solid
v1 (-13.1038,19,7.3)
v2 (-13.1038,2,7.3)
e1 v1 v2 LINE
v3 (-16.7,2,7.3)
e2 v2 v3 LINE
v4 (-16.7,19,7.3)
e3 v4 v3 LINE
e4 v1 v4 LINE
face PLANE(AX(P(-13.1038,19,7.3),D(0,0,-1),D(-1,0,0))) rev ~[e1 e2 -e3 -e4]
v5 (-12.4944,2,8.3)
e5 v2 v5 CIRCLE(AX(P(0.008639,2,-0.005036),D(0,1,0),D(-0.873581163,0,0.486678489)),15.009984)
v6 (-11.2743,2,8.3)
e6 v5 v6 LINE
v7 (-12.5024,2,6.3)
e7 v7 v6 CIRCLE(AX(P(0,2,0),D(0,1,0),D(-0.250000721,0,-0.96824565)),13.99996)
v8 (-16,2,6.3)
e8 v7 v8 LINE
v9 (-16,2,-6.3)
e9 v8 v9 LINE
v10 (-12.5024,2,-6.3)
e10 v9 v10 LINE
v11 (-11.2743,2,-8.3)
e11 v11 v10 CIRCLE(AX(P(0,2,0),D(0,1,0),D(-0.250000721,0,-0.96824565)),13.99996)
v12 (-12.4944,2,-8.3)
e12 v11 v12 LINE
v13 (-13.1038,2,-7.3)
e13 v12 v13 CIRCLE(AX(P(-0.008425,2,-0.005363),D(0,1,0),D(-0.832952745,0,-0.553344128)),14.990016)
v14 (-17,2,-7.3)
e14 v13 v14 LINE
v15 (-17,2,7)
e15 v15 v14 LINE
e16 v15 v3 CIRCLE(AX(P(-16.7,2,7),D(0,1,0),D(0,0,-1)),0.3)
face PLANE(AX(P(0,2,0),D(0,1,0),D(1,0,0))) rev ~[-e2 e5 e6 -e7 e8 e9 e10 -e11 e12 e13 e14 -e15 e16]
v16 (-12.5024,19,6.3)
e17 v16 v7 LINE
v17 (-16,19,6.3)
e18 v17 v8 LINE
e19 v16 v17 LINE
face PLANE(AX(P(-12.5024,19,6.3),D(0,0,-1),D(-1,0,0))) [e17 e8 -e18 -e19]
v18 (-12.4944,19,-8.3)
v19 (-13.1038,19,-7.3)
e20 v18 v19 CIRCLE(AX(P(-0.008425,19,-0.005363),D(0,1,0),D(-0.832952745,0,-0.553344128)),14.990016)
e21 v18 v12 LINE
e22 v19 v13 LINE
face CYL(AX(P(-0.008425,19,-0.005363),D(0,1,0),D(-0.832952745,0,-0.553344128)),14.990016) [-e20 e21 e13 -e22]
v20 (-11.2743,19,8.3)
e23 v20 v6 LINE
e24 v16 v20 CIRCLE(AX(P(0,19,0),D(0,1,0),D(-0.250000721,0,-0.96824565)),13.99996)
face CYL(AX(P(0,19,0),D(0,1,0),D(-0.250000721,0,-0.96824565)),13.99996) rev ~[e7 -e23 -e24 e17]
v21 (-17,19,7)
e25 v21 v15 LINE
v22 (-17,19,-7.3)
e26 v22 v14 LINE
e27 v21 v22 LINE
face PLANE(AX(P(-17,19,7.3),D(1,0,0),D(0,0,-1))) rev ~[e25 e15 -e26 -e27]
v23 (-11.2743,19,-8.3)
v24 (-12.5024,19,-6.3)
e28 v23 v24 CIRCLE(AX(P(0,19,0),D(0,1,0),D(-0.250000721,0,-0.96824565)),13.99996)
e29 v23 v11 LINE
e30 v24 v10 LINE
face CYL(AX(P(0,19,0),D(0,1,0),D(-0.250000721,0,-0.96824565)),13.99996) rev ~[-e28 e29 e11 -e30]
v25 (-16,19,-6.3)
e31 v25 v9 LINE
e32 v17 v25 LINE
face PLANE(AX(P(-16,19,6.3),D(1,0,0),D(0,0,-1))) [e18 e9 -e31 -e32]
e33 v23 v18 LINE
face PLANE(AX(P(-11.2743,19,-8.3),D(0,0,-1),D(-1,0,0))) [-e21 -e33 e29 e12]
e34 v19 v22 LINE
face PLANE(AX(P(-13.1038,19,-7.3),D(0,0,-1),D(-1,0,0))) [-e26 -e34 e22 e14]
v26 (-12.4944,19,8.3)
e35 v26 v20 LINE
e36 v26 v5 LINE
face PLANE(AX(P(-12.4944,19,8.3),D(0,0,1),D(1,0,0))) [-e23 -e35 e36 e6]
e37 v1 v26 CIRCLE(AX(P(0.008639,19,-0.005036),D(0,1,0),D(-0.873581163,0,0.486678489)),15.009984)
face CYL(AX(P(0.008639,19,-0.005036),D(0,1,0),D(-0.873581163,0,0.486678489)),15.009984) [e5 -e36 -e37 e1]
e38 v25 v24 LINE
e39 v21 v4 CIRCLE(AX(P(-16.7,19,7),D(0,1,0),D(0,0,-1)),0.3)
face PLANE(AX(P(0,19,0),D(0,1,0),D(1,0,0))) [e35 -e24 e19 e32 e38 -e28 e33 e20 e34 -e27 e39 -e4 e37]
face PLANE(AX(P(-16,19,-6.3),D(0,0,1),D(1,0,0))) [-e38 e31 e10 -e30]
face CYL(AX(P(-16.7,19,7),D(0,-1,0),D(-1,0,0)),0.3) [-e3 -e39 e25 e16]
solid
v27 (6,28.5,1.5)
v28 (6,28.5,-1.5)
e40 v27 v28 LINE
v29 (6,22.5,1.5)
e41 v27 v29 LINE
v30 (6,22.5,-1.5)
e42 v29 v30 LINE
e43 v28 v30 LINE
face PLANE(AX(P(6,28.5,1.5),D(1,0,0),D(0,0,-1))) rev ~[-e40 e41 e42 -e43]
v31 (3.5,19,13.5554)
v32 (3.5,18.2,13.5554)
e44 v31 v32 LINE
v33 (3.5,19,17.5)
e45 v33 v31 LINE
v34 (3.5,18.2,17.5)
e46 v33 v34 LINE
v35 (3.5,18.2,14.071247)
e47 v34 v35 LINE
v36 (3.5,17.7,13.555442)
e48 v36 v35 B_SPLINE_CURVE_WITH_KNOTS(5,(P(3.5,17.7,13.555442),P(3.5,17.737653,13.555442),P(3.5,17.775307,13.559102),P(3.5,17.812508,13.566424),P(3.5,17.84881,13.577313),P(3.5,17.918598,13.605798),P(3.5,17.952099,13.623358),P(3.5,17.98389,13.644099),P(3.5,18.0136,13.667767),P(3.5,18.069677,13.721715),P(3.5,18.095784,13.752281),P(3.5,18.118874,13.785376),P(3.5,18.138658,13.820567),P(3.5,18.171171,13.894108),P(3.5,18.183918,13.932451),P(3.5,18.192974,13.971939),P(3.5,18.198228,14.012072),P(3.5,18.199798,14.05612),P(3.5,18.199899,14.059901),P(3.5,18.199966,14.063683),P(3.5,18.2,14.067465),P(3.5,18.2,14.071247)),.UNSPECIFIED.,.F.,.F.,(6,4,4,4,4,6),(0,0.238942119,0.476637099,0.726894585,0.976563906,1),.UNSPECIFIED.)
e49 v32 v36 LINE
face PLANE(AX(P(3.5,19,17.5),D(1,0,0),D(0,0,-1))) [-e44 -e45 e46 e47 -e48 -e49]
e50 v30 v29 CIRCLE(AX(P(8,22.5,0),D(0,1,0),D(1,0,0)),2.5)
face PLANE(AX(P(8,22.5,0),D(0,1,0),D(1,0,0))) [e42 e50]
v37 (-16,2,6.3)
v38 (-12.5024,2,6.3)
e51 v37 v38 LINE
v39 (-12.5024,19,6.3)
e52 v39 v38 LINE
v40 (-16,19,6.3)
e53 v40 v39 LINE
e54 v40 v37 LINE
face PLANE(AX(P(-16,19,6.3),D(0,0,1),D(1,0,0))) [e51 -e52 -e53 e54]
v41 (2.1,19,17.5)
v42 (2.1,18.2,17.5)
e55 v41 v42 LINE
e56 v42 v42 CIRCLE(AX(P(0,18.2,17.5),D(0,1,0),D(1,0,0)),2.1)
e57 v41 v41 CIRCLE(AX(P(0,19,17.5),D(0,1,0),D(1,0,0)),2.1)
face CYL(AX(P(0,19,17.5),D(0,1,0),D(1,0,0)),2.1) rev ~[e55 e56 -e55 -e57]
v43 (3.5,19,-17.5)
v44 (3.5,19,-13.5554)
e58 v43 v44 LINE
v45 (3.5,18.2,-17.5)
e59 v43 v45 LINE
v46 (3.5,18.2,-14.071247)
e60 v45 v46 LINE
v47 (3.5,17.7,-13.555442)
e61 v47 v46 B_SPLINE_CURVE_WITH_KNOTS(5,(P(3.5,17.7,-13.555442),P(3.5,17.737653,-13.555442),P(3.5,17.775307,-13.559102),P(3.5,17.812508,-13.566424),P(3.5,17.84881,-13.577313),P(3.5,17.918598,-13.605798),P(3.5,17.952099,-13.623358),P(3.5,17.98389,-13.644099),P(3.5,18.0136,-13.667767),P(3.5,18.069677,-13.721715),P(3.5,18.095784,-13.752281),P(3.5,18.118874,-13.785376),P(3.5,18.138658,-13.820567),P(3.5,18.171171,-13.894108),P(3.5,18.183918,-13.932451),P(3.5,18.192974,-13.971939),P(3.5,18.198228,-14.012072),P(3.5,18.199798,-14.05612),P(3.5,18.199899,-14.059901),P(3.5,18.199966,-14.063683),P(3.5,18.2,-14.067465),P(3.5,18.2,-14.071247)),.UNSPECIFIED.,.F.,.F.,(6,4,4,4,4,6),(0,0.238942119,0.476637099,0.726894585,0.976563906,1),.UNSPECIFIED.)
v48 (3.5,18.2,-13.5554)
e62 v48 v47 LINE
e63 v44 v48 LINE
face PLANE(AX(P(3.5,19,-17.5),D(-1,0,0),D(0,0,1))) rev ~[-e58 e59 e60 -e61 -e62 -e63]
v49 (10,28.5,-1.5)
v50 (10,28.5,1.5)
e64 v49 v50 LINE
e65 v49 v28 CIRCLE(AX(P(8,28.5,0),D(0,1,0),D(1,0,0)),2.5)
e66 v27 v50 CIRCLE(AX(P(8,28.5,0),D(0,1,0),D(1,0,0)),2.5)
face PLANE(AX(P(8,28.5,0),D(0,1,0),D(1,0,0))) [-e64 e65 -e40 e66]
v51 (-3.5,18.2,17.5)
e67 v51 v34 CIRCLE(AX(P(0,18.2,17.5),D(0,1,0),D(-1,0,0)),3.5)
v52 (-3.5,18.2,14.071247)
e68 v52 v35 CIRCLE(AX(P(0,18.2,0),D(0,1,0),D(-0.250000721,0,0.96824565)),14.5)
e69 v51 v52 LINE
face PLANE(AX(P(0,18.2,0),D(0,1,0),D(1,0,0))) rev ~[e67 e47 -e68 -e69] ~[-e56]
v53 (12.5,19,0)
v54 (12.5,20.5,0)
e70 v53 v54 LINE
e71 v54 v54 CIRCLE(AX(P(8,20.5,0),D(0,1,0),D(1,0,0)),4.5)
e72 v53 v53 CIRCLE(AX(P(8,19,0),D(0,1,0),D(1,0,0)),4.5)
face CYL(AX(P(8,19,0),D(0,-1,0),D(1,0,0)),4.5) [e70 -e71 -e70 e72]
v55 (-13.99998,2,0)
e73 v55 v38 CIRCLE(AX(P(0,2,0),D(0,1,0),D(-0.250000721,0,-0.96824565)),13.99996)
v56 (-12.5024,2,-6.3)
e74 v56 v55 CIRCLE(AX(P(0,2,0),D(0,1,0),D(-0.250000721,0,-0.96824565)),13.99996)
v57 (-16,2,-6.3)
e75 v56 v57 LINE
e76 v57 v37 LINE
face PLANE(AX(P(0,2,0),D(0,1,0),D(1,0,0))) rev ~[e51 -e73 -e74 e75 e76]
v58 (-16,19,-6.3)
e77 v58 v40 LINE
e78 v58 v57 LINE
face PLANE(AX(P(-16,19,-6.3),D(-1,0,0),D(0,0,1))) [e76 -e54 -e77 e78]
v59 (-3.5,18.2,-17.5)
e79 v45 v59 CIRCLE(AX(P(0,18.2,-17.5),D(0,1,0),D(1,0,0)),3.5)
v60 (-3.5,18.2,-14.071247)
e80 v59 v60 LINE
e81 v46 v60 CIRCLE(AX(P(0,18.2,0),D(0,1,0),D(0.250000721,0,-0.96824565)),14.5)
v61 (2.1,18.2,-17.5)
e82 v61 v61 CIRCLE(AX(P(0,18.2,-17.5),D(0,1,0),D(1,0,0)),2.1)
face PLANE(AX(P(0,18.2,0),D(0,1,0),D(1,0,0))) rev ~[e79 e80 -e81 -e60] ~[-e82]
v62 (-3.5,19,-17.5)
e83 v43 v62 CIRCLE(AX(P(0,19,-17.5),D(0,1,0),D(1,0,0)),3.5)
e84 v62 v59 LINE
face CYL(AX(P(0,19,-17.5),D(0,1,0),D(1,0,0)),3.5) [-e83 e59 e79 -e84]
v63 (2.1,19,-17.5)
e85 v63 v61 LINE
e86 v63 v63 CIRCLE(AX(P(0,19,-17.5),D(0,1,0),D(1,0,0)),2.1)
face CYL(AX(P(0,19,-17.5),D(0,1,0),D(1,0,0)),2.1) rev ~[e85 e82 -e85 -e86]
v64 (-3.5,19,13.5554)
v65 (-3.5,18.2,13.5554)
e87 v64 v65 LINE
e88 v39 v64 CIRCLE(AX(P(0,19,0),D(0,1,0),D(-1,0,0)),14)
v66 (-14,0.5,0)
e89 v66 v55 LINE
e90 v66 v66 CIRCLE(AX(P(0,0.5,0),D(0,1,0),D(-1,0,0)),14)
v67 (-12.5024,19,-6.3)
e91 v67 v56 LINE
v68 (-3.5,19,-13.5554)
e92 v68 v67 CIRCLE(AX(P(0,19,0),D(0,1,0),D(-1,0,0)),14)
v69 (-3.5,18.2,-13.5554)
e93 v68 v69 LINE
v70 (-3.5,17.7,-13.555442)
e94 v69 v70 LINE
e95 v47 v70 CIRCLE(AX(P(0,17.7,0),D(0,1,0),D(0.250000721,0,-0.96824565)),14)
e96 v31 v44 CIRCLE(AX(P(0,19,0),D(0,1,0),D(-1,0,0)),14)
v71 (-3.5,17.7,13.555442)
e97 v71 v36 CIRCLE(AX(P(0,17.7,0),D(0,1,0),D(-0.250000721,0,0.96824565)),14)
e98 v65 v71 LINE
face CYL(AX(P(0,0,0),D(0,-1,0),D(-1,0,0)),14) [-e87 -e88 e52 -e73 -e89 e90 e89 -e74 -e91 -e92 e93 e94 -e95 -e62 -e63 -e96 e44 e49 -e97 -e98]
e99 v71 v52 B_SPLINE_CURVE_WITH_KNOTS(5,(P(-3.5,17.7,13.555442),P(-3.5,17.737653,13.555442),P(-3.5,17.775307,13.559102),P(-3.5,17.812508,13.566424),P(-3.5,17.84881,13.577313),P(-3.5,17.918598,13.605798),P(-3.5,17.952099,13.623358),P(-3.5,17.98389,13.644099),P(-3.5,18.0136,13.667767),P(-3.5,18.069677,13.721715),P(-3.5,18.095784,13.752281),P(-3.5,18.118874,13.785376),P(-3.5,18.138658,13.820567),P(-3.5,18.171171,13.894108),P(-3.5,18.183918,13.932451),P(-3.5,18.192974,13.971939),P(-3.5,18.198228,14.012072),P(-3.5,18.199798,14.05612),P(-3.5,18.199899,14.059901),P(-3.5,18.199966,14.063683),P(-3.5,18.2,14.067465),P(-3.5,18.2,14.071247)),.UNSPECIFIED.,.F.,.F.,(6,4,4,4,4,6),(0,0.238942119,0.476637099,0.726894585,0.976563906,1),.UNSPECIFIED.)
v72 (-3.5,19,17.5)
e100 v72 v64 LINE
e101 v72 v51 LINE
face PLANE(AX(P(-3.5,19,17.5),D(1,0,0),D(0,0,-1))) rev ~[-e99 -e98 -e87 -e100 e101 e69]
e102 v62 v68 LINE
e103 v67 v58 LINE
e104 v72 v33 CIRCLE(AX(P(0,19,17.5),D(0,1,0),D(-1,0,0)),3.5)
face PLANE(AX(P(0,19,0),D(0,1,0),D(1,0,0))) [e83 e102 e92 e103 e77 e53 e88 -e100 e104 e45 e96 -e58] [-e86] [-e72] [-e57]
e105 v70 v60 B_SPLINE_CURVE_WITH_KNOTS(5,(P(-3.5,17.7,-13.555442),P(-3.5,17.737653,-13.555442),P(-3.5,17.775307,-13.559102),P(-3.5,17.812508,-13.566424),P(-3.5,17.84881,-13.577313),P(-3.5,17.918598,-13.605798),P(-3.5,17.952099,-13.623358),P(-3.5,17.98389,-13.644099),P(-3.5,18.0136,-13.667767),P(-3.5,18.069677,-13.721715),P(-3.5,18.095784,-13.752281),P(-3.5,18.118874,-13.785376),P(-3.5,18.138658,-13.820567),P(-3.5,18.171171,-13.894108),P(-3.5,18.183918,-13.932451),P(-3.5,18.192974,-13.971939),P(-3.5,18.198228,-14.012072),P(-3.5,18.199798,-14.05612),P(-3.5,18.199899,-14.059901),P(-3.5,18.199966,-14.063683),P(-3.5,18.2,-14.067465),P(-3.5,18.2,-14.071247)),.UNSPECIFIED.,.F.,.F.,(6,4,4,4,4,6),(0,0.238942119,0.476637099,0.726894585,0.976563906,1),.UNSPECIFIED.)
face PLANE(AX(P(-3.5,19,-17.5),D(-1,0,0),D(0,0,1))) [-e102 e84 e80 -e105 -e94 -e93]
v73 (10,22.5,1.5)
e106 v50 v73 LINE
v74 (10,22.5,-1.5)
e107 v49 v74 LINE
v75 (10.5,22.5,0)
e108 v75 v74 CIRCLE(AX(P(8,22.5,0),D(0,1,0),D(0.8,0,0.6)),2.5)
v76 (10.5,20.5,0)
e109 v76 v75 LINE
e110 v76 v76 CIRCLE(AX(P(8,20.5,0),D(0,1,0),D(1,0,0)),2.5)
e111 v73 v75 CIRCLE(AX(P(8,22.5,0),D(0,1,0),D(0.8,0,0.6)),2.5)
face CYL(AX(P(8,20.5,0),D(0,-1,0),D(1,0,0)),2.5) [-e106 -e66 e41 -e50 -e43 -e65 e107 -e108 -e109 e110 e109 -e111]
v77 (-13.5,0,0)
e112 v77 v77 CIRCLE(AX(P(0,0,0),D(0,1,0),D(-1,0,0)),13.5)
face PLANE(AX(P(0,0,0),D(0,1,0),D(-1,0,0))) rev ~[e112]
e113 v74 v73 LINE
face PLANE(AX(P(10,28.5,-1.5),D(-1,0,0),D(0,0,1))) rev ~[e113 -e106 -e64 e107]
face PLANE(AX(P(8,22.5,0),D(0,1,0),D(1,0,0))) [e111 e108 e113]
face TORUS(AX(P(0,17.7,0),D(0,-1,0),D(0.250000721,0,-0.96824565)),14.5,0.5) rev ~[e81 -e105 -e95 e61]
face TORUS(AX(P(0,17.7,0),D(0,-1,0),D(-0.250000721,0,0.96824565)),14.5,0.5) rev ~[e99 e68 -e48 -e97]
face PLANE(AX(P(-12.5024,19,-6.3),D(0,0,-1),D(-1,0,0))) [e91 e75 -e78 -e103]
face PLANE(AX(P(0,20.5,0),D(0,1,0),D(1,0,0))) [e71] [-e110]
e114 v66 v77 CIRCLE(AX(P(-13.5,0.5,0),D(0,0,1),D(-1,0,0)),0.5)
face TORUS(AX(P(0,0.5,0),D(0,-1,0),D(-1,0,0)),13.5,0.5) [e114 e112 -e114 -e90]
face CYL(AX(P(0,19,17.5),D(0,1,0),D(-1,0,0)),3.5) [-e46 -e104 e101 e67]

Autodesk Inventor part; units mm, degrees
ref_plane "YZ Plane" through (0, 0, 0) normal (1, 0, 0) x (0, 1, 0)
ref_plane "XZ Plane" through (0, 0, 0) normal (0, 1, 0) x (-1, 0, 0)
ref_plane "XY Plane" through (0, 0, 0) normal (0, 0, 1) x (1, 0, 0)
sketch "Эскиз1" plane through (0, 0, 0) normal (0, 1, 0) x (-1, 0, 0)
  circle A0 centre (0, 0) radius 14
  dimension "d0" = 28
extrude "Выдавливание1" add sketch "Эскиз1" along normal blind 19
sketch "Эскиз2" plane through (0, 19, 0) normal (0, 1, 0) x (1, 0, 0)
  circle A0 centre (8, 0) radius 4.5
  point P0 (0, 0)
  dimension "d3" = 9
  dimension "d4" = 8
extrude "Выдавливание2" add sketch "Эскиз2" along normal blind 1.5
sketch "Эскиз3" plane through (8, 20.5, 0) normal (0, 1, 0) x (1, 0, 0)
  circle A0 centre (0, 0) radius 2.5
  point P0 (-8, 0)
  dimension "d7" = 5
extrude "Выдавливание3" add sketch "Эскиз3" along normal blind 8
sketch "Эскиз4" plane through (8, 28.5, 0) normal (0, 1, 0) x (1, 0, 0)
  circle A0 centre (0, 0) radius 2.5 projected
  line L0 (2, 1.5) -> (2, -1.5)
  line L1 (-2, -1.5) -> (-2, 1.5)
  point P0 (-8, 0)
  dimension "d12" = 3
  dimension "d13" = 3
extrude "Выдавливание4" cut sketch "Эскиз4" against normal blind 6 contours A0 L0 | L1 A0
sketch "Эскиз5" plane through (0, 19, 0) normal (0, 1, 0) x (1, 0, 0)
  arc A0 (-3.5, -17.5) -> (3.5, -17.5) centre (0, -17.5) ccw
  arc A1 (3.5, 17.5) -> (-3.5, 17.5) centre (0, 17.5) ccw
  circle A2 centre (0, 0) radius 14 projected
  line L0 (-3.5, -17.5) -> (-3.5, -13.5554)
  line L1 (3.5, 17.5) -> (3.5, 13.5554)
  line L2 (-3.5, 17.5) -> (-3.5, 13.5554)
  line L3 (3.5, -17.5) -> (3.5, -13.5554)
  line L4 (0, 29.4009) -> (0, -29.4054) construction
  circle A3 centre (8, 0) radius 4.5 projected
  dimension "d16" = 7
  dimension "d17" = 17.5
  dimension "d18" = 7
  dimension "d19" = 17.5
  dimension "d41" = 8
extrude "Выдавливание5" add sketch "Эскиз5" against normal blind 0.8 contours L0 A2 L3 A0 | L2 A1 L1 A2
sketch "Эскиз6" plane through (0, 19, 0) normal (0, 1, 0) x (1, 0, 0)
  circle A0 centre (0, 17.5) radius 2.1
  circle A1 centre (0, -17.5) radius 2.1
  point P0 (0, 0)
  dimension "d22" = 4.2
  dimension "d23" = 4.2
  dimension "d24" = 17.5
  dimension "d25" = 17.5
extrude "Выдавливание6" cut sketch "Эскиз6" against normal blind 0.8
fillet "Сопряжение1" radius 0.5 1 edges at (14, 0, 0)
fillet "Сопряжение2" radius 0.5 1 edges at (0, 18.2, -14)
fillet "Сопряжение3" radius 0.5 1 edges at (0, 18.2, 14)
sketch "Эскиз7" plane through (0, 19, 0) normal (0, 1, 0) x (1, 0, 0)
  line L0 (-17, -7.3) -> (-17, 7.3)
  line L1 (0, 0) -> (-17, 0) construction
  line L2 (-13.1038, 7.3) -> (-17, 7.3)
  line L3 (-13.1038, -7.3) -> (-17, -7.3)
  arc A0 (-3.5, 13.5554) -> (-3.5, -13.5554) centre (0, 0) ccw projected
  line L4 (-12.5024, -6.3) -> (-16, -6.3)
  line L5 (-16, -6.3) -> (-16, 6.3)
  line L6 (-16, 6.3) -> (-12.5024, 6.3)
  line L7 (-11.2743, 8.3) -> (-12.4944, 8.3)
  line L8 (-12.4944, -8.3) -> (-11.2743, -8.3)
  arc A1 (-12.4944, 8.3) -> (-13.1038, 7.3) centre (0, 0) ccw
  arc A2 (-13.1038, -7.3) -> (-12.4944, -8.3) centre (0, 0) ccw
  point P0 (0, 7.4186)
  point P1 (0, -7.4186)
  point P2 (-11.9461, 7.3)
  point P3 (-11.9461, -7.3)
  dimension "d31" = 17
  dimension "d32" = 14.6
  dimension "d33" = 1
  dimension "d35" = 1
extrude "Выдавливание7" add sketch "Эскиз7" against normal blind 17 separate body contours L0 L2 A1 L7 A0 L6 L5 L4 L8 A2 L3
sketch "Эскиз9" plane through (0, 19, 0) normal (0, 1, 0) x (1, 0, 0)
  arc A0 (-3.5, 13.5554) -> (-3.5, -13.5554) centre (0, 0) ccw projected
  line L0 (-3.5, 13.5554) -> (-3.5, 17.5) projected
  arc A1 (3.5, 17.5) -> (-3.5, 17.5) centre (0, 17.5) ccw projected
  line L1 (3.5, 17.5) -> (3.5, 13.5554) projected
  arc A2 (3.5, -13.5554) -> (3.5, 13.5554) centre (0, 0) ccw projected
  line L2 (3.5, -13.5554) -> (3.5, -17.5) projected
  arc A3 (-3.5, -17.5) -> (3.5, -17.5) centre (0, -17.5) ccw projected
  line L3 (-3.5, -17.5) -> (-3.5, -13.5554) projected
  circle A4 centre (0, 17.5) radius 2.1 projected
  circle A5 centre (0, -17.5) radius 2.1 projected
  circle A6 centre (8, 0) radius 4.5 projected
  arc A7 (-13.1038, -7.3) -> (-12.4944, -8.3) centre (0, 0) ccw projected
  line L4 (-13.1038, -7.3) -> (-17, -7.3) projected
  line L5 (-17, -7.3) -> (-17, 7.3) projected
  line L6 (-17, 7.3) -> (-13.1038, 7.3) projected
  arc A8 (-12.4944, 8.3) -> (-13.1038, 7.3) centre (0, 0) ccw projected
  line L7 (-12.4944, 8.3) -> (-11.2743, 8.3) projected
  arc A9 (-11.2743, 8.3) -> (-12.5024, 6.3) centre (0, 0) ccw projected
  line L8 (-12.5024, 6.3) -> (-16, 6.3) projected
  line L9 (-16, 6.3) -> (-16, -6.3) projected
  line L10 (-16, -6.3) -> (-12.5024, -6.3) projected
  arc A10 (-12.5024, -6.3) -> (-11.2743, -8.3) centre (0, 0) ccw projected
  line L11 (-11.2743, -8.3) -> (-12.4944, -8.3) projected
  arc A11 (-3.5, 13.5554) -> (-3.5, -13.5554) centre (0, 0) ccw projected
  line L12 (-3.5, 13.5554) -> (-3.5, 17.5) projected
  line L13 (-3.5, -17.5) -> (-3.5, -13.5554) projected
  circle A12 centre (0, 17.5) radius 2.1 projected
  circle A13 centre (0, -17.5) radius 2.1 projected
  circle A14 centre (8, 0) radius 4.5 projected
  arc A15 (-13.1038, -7.3) -> (-12.4944, -8.3) centre (0, 0) ccw projected
  line L14 (-13.1038, -7.3) -> (-17, -7.3) projected
  line L15 (-17, -7.3) -> (-17, 7.3) projected
  line L16 (-17, 7.3) -> (-13.1038, 7.3) projected
  arc A16 (-12.4944, 8.3) -> (-13.1038, 7.3) centre (0, 0) ccw projected
  line L17 (-12.4944, 8.3) -> (-11.2743, 8.3) projected
  arc A17 (-11.2743, 8.3) -> (-12.5024, 6.3) centre (0, 0) ccw projected
  line L18 (-12.5024, 6.3) -> (-16, 6.3) projected
  line L19 (-16, 6.3) -> (-16, -6.3) projected
  line L20 (-16, -6.3) -> (-12.5024, -6.3) projected
  arc A18 (-12.5024, -6.3) -> (-11.2743, -8.3) centre (0, 0) ccw projected
  line L21 (-11.2743, -8.3) -> (-12.4944, -8.3) projected
  arc A19 (-3.5, 13.5554) -> (-3.5, -13.5554) centre (0, 0) ccw projected
  line L22 (-3.5, 13.5554) -> (-3.5, 17.5) projected
  line L23 (-3.5, -17.5) -> (-3.5, -13.5554) projected
  circle A20 centre (0, 17.5) radius 2.1 projected
  circle A21 centre (0, -17.5) radius 2.1 projected
  circle A22 centre (8, 0) radius 4.5 projected
  arc A23 (-13.1038, -7.3) -> (-12.4944, -8.3) centre (0, 0) ccw projected
  line L24 (-13.1038, -7.3) -> (-17, -7.3) projected
  line L25 (-17, -7.3) -> (-17, 7.3) projected
  line L26 (-17, 7.3) -> (-13.1038, 7.3) projected
  arc A24 (-12.4944, 8.3) -> (-13.1038, 7.3) centre (0, 0) ccw projected
  line L27 (-12.4944, 8.3) -> (-11.2743, 8.3) projected
  arc A25 (-11.2743, 8.3) -> (-12.5024, 6.3) centre (0, 0) ccw projected
  line L28 (-12.5024, 6.3) -> (-16, 6.3) projected
  line L29 (-16, 6.3) -> (-16, -6.3) projected
  line L30 (-16, -6.3) -> (-12.5024, -6.3) projected
  arc A26 (-12.5024, -6.3) -> (-11.2743, -8.3) centre (0, 0) ccw projected
  line L31 (-11.2743, -8.3) -> (-12.4944, -8.3) projected
  arc A27 (-3.5, 13.5554) -> (-3.5, -13.5554) centre (0, 0) ccw projected
  line L32 (-3.5, 13.5554) -> (-3.5, 17.5) projected
  line L33 (-3.5, -17.5) -> (-3.5, -13.5554) projected
  circle A28 centre (0, 17.5) radius 2.1 projected
  circle A29 centre (0, -17.5) radius 2.1 projected
  circle A30 centre (8, 0) radius 4.5 projected
  arc A31 (-13.1038, -7.3) -> (-12.4944, -8.3) centre (0, 0) ccw projected
  line L34 (-13.1038, -7.3) -> (-17, -7.3) projected
  line L35 (-17, -7.3) -> (-17, 7.3) projected
  line L36 (-17, 7.3) -> (-13.1038, 7.3) projected
  arc A32 (-12.4944, 8.3) -> (-13.1038, 7.3) centre (0, 0) ccw projected
  line L37 (-12.4944, 8.3) -> (-11.2743, 8.3) projected
  arc A33 (-11.2743, 8.3) -> (-12.5024, 6.3) centre (0, 0) ccw projected
  line L38 (-12.5024, 6.3) -> (-16, 6.3) projected
  line L39 (-16, 6.3) -> (-16, -6.3) projected
  line L40 (-16, -6.3) -> (-12.5024, -6.3) projected
  arc A34 (-12.5024, -6.3) -> (-11.2743, -8.3) centre (0, 0) ccw projected
  line L41 (-11.2743, -8.3) -> (-12.4944, -8.3) projected
  arc A35 (-3.5, 13.5554) -> (-3.5, -13.5554) centre (0, 0) ccw projected
  line L42 (-16, 6.3) -> (-12.5024, 6.3) projected
  line L43 (-16, -6.3) -> (-16, 6.3) projected
  circle A36 centre (0, 17.5) radius 2.1 projected
  circle A37 centre (0, -17.5) radius 2.1 projected
  circle A38 centre (8, 0) radius 4.5 projected
  arc A39 (-3.5, 13.5554) -> (-3.5, -13.5554) centre (0, 0) ccw projected
  line L44 (-3.5, -13.5554) -> (-3.5, -17.5) projected
  arc A40 (-3.5, -17.5) -> (3.5, -17.5) centre (0, -17.5) ccw projected
  line L45 (3.5, -17.5) -> (3.5, -13.5554) projected
  arc A41 (3.5, -13.5554) -> (3.5, 13.5554) centre (0, 0) ccw projected
  line L46 (3.5, 13.5554) -> (3.5, 17.5) projected
  arc A42 (3.5, 17.5) -> (-3.5, 17.5) centre (0, 17.5) ccw projected
  line L47 (-3.5, 17.5) -> (-3.5, 13.5554) projected
  arc A43 (-3.5, 13.5554) -> (-3.5, -13.5554) centre (0, 0) ccw projected
  line L48 (-3.5, 13.5554) -> (-3.5, 17.5) projected
  line L49 (-3.5, -17.5) -> (-3.5, -13.5554) projected
  circle A44 centre (0, 17.5) radius 2.1 projected
  circle A45 centre (0, -17.5) radius 2.1 projected
  circle A46 centre (8, 0) radius 4.5 projected
  arc A47 (-13.1038, -7.3) -> (-12.4944, -8.3) centre (0, 0) ccw projected
  line L50 (-13.1038, -7.3) -> (-17, -7.3) projected
  line L51 (-17, -7.3) -> (-17, 7.3) projected
  line L52 (-17, 7.3) -> (-13.1038, 7.3) projected
  arc A48 (-12.4944, 8.3) -> (-13.1038, 7.3) centre (0, 0) ccw projected
  line L53 (-12.4944, 8.3) -> (-11.2743, 8.3) projected
  arc A49 (-11.2743, 8.3) -> (-12.5024, 6.3) centre (0, 0) ccw projected
  line L54 (-12.5024, 6.3) -> (-16, 6.3) projected
  line L55 (-16, 6.3) -> (-16, -6.3) projected
  line L56 (-16, -6.3) -> (-12.5024, -6.3) projected
  arc A50 (-12.5024, -6.3) -> (-11.2743, -8.3) centre (0, 0) ccw projected
  line L57 (-11.2743, -8.3) -> (-12.4944, -8.3) projected
  arc A51 (3.5, 17.5) -> (-3.5, 17.5) centre (0, 17.5) ccw projected
  line L58 (3.5, 17.5) -> (3.5, 13.5554) projected
  arc A52 (3.5, -13.5554) -> (3.5, 13.5554) centre (0, 0) ccw projected
  line L59 (3.5, -13.5554) -> (3.5, -17.5) projected
  arc A53 (-3.5, -17.5) -> (3.5, -17.5) centre (0, -17.5) ccw projected
  arc A54 (3.5, 17.5) -> (-3.5, 17.5) centre (0, 17.5) ccw projected
  line L60 (3.5, 17.5) -> (3.5, 13.5554) projected
  arc A55 (3.5, -13.5554) -> (3.5, 13.5554) centre (0, 0) ccw projected
  line L61 (3.5, -13.5554) -> (3.5, -17.5) projected
  arc A56 (-3.5, -17.5) -> (3.5, -17.5) centre (0, -17.5) ccw projected
  arc A57 (3.5, 17.5) -> (-3.5, 17.5) centre (0, 17.5) ccw projected
  line L62 (3.5, 17.5) -> (3.5, 13.5554) projected
  arc A58 (3.5, -13.5554) -> (3.5, 13.5554) centre (0, 0) ccw projected
  line L63 (3.5, -13.5554) -> (3.5, -17.5) projected
  arc A59 (-3.5, -17.5) -> (3.5, -17.5) centre (0, -17.5) ccw projected
  arc A60 (3.5, 17.5) -> (-3.5, 17.5) centre (0, 17.5) ccw projected
  line L64 (3.5, 17.5) -> (3.5, 13.5554) projected
  arc A61 (3.5, -13.5554) -> (3.5, 13.5554) centre (0, 0) ccw projected
  line L65 (3.5, -13.5554) -> (3.5, -17.5) projected
  arc A62 (-3.5, -17.5) -> (3.5, -17.5) centre (0, -17.5) ccw projected
extrude "Выдавливание8" add sketch "Эскиз9" against normal blind 17 contours A0 L10 L9 L8 bodies 1
fillet "Сопряжение4" radius 0.3 1 edges at (-17, 10.5, 7.3)
properties part number "Stepper 28BYJ-48"
